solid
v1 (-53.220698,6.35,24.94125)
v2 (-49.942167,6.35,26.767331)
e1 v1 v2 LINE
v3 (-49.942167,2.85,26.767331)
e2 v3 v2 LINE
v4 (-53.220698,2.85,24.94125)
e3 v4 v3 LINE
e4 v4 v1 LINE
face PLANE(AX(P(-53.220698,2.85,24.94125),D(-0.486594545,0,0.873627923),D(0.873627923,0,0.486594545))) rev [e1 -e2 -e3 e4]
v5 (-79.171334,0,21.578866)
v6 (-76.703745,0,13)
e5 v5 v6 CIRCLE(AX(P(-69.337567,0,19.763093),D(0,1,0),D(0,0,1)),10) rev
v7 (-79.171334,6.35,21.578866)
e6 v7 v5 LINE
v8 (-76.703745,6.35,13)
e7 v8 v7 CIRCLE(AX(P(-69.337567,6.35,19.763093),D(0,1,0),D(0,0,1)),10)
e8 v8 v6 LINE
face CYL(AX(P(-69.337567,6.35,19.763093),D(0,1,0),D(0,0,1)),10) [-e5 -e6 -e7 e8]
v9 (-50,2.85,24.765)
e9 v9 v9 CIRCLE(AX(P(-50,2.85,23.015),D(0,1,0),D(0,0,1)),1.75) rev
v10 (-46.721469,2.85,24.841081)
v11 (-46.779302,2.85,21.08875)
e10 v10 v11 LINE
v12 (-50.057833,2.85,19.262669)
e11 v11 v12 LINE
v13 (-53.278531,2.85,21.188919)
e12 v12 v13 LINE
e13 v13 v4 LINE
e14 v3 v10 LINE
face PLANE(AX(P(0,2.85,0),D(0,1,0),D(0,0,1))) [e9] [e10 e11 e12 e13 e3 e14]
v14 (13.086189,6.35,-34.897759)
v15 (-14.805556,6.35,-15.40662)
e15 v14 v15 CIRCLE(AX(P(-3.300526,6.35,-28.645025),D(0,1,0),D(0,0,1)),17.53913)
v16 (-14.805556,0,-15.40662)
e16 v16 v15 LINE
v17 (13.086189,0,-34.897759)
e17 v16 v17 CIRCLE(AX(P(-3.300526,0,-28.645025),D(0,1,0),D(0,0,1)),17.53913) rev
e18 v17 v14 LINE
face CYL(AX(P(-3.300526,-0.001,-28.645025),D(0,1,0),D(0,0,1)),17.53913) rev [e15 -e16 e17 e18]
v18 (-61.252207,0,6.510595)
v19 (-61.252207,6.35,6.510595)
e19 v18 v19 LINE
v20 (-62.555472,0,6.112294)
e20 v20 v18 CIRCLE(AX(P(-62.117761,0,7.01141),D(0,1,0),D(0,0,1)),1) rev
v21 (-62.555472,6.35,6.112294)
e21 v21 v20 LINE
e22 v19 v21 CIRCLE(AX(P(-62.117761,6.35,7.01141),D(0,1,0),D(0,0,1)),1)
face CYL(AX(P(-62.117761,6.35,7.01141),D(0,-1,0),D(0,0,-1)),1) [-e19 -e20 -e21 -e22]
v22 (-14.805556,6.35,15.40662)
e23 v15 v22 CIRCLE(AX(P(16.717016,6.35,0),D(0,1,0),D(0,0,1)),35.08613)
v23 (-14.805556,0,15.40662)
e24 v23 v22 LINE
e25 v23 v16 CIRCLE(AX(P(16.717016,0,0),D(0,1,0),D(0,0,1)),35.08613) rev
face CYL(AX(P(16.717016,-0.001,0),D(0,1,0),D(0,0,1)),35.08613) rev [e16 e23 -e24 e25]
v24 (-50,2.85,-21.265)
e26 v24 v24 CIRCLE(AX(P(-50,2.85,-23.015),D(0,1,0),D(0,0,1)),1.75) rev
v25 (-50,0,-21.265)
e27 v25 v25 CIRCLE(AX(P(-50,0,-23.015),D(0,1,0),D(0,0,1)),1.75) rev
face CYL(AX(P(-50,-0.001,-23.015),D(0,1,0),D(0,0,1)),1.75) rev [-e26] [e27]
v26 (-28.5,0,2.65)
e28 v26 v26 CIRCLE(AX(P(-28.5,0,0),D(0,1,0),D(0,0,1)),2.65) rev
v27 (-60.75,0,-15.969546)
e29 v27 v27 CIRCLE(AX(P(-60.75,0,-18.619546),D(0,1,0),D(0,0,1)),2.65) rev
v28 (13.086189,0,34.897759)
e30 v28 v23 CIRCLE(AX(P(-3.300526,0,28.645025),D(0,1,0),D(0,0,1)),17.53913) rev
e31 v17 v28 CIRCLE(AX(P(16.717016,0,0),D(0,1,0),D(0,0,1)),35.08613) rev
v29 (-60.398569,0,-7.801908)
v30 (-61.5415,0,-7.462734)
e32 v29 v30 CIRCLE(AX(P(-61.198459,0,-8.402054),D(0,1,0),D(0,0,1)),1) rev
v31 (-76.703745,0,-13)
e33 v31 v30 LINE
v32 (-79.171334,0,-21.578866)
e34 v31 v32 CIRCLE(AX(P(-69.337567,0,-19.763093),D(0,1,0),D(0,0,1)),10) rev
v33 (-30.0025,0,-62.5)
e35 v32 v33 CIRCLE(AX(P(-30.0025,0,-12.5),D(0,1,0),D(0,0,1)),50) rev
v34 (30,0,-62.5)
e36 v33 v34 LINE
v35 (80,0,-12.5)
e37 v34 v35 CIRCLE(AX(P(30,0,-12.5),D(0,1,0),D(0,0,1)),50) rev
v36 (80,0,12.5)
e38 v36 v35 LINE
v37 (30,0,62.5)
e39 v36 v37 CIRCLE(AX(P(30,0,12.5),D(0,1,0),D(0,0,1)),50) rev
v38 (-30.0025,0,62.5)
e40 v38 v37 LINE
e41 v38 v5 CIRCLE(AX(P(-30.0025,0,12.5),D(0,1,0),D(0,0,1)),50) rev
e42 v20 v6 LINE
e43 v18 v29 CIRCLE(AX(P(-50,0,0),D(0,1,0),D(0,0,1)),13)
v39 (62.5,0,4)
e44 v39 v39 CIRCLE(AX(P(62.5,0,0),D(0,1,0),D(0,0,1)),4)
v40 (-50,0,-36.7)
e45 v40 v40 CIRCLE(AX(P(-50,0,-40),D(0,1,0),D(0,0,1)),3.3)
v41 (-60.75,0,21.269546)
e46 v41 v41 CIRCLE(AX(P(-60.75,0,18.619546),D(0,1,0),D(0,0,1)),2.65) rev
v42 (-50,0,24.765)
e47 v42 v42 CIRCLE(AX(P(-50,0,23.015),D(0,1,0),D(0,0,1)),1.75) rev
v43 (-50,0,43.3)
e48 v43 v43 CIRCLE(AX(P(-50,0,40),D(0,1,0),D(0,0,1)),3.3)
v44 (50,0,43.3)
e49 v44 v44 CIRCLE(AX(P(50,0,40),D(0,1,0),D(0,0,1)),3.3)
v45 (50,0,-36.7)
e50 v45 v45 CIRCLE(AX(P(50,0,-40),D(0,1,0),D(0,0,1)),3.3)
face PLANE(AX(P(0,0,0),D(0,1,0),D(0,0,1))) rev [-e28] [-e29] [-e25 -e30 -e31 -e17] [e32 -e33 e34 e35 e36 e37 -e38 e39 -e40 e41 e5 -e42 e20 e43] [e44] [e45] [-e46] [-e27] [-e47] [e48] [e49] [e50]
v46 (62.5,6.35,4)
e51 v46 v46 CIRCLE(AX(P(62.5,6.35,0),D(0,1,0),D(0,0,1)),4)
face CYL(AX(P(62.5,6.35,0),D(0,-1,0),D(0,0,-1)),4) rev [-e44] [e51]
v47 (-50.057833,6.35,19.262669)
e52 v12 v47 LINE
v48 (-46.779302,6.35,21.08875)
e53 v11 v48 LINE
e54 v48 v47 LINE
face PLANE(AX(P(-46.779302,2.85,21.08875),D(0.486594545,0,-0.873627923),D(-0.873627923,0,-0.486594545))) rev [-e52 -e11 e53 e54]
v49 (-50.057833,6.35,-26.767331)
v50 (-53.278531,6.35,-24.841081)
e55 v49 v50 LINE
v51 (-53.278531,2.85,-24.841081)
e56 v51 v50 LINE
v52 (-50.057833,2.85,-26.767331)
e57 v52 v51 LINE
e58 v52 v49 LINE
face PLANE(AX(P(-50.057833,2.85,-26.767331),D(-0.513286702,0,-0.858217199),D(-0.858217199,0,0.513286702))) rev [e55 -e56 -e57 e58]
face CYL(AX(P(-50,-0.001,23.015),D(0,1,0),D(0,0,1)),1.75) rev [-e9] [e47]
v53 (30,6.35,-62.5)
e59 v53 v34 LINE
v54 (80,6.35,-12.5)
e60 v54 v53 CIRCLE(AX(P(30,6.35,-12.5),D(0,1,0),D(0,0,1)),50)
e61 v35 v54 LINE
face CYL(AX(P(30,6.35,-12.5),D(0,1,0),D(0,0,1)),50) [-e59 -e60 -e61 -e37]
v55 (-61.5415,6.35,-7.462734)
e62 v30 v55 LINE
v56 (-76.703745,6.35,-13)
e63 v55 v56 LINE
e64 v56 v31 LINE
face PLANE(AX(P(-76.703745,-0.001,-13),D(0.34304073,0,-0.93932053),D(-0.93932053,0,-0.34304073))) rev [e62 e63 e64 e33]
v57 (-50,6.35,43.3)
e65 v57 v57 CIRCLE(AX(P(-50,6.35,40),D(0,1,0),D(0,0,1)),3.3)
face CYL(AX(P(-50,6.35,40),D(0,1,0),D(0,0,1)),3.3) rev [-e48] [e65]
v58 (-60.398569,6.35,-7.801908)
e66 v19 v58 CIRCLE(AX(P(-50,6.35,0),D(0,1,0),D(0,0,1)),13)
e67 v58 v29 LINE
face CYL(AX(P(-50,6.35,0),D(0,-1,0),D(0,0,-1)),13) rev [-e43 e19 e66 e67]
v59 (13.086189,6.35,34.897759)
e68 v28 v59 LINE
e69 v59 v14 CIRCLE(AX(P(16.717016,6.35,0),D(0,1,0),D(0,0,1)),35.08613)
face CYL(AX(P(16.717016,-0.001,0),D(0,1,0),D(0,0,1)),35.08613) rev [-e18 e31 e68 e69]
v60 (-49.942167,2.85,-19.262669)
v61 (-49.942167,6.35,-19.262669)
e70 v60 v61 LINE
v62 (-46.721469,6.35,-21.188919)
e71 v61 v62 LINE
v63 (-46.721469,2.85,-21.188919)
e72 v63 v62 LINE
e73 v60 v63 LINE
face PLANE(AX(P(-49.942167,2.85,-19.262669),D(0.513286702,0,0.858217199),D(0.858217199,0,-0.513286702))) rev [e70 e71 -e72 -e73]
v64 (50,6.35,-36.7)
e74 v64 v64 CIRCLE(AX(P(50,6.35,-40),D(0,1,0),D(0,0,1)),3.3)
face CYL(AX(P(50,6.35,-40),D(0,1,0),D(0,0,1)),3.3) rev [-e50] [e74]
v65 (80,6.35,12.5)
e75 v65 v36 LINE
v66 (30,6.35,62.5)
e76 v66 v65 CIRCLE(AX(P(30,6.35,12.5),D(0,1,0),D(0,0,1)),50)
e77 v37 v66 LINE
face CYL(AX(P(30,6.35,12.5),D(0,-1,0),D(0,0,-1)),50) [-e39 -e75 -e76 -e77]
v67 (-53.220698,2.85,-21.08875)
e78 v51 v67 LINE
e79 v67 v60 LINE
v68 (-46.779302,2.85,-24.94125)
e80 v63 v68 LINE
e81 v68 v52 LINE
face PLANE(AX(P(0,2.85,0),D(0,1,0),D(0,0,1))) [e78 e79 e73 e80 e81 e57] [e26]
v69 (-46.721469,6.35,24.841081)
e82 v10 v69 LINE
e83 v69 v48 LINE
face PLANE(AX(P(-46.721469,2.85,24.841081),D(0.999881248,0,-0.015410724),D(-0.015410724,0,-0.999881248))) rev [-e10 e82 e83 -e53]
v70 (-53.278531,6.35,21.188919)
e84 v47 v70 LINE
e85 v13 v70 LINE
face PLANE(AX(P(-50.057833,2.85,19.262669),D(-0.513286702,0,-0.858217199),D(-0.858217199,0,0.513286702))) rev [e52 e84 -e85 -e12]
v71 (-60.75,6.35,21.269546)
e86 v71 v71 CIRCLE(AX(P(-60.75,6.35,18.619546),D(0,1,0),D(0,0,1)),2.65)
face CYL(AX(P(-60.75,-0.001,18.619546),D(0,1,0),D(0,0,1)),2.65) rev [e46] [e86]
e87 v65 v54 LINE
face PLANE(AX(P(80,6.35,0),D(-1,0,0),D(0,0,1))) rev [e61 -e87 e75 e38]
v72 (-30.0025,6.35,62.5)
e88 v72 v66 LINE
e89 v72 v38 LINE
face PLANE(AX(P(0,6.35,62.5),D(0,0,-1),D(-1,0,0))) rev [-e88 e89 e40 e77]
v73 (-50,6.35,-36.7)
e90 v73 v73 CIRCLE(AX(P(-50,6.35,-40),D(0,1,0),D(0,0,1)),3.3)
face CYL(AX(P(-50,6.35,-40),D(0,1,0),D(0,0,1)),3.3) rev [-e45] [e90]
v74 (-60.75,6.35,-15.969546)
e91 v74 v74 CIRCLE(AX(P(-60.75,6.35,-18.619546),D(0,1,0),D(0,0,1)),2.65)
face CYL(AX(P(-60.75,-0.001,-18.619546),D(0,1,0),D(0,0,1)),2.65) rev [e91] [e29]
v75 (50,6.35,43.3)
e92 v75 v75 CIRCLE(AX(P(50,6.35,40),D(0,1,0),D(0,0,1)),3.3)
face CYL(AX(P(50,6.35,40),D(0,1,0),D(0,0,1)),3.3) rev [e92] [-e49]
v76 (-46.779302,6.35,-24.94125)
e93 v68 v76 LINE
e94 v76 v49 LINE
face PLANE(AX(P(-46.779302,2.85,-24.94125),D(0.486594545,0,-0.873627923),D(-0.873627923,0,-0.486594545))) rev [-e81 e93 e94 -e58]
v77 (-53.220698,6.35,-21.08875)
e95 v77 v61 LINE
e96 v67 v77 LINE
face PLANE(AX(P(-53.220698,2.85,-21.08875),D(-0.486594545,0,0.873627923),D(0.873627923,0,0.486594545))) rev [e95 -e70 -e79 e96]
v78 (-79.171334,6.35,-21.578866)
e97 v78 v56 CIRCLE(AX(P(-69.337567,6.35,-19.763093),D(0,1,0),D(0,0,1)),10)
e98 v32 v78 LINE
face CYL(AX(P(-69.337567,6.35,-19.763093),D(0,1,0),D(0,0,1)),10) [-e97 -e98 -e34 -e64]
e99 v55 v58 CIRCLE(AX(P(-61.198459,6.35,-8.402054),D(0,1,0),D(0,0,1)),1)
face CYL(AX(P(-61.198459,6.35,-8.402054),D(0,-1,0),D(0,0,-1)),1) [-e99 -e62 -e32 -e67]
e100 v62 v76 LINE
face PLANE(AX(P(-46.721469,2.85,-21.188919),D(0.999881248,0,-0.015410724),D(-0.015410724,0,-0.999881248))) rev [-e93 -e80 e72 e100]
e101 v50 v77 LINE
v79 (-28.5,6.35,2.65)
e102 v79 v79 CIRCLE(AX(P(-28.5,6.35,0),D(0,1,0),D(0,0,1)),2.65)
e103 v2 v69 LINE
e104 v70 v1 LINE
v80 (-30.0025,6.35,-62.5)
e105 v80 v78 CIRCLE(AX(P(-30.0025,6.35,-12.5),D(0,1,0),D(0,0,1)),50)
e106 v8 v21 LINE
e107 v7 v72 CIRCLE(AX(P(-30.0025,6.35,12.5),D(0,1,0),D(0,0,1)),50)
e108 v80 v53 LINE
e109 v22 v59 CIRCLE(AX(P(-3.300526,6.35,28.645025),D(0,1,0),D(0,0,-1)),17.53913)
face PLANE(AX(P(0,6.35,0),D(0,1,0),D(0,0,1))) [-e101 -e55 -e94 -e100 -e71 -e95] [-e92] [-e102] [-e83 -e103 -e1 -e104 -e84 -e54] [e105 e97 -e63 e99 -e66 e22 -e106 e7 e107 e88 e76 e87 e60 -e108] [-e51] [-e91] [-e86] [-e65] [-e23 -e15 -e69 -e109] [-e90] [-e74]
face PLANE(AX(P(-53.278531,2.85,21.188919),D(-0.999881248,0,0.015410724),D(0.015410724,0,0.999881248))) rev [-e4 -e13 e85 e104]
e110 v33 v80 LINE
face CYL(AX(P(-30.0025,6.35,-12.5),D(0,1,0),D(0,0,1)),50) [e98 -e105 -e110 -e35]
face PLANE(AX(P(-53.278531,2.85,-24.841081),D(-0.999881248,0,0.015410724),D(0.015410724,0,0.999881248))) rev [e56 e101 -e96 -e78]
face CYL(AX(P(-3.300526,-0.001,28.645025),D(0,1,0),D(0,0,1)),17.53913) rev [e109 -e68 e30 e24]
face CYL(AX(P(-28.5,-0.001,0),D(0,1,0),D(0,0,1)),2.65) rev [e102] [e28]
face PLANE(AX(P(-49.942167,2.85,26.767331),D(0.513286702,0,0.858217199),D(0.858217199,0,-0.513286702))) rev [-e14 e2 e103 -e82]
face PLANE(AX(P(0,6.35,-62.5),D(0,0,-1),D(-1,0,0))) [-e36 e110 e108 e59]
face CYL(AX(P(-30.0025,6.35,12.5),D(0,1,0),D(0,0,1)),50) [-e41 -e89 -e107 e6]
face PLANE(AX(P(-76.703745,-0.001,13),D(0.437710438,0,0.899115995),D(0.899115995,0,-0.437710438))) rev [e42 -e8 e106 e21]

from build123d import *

# Parameters (mm, degrees)
SKETCH2_R                = 13
SKETCH2_R_2              = 4
BOSS_EXTRUDE1_DEPTH      = 6.35
FILLET1_R                = 50
M6_CLEARANCE_HOLE1_D     = 6.6
M6_CLEARANCE_HOLE1_DEPTH = 15
M6_CLEARANCE_HOLE1_TIP   = 1.982840043
FILLET2_R                = 10
CUT_EXTRUDE1_REACH       = 103.718
SKETCH5_R                = 2.65
SKETCH5_R_2              = 1.75
CUT_EXTRUDE2_DEPTH       = 3.5
CUT_EXTRUDE3_REACH       = 103.718
FILLET3_R                = 1
CUT_EXTRUDE4_REACH       = 103.718


with BuildPart() as part:
    # Sketch2 → Boss-Extrude1 (new body)
    with BuildSketch(Plane(origin=(0, 0, 0), x_dir=(1, 0, 0), z_dir=(0, 1, 0))):
        with BuildLine():
            ThreePointArc((-76.703745056, 13), (-79.7, 0), (-76.703745056, -13))
            Line((-76.703745056, -13), (-80, -13))
            Line((-80, -13), (-80, -62.5))
            Line((-80, -62.5), (80, -62.5))
            Line((80, -62.5), (80, 62.5))
            Line((80, 62.5), (-80, 62.5))
            Line((-80, 62.5), (-80, 13))
            Line((-80, 13), (-76.703745056, 13))
        make_face()
        with Locations(Location((-50, 0, 0), (0, 0, 270))):
            Circle(SKETCH2_R, mode=Mode.SUBTRACT)
        with Locations(Location((62.5, 0, 0), (0, 0, 270))):
            Circle(SKETCH2_R_2, mode=Mode.SUBTRACT)
    extrude(amount=BOSS_EXTRUDE1_DEPTH)

    # Fillet1
    # the kernel refuses this fillet: 50 mm, written as the material it takes off along each edge
    with BuildSketch(Plane(origin=(80, -125, 62.5), x_dir=(-1, 0, 0), z_dir=(0, 1, 0)), Plane(origin=(80, -125, -62.5), x_dir=(0, 0, 1), z_dir=(0, 1, 0))) as fillet1_piece_1:
        with BuildLine():
            CenterArc((FILLET1_R, -FILLET1_R), FILLET1_R, 90, 90)
            Line((0, -FILLET1_R), (-FILLET1_R * 0.02, -FILLET1_R))
            Line((-FILLET1_R * 0.02, -FILLET1_R), (-FILLET1_R * 0.02, FILLET1_R * 0.02))
            Line((-FILLET1_R * 0.02, FILLET1_R * 0.02), (FILLET1_R, FILLET1_R * 0.02))
            Line((FILLET1_R, FILLET1_R * 0.02), (FILLET1_R, 0))
        make_face()
    extrude(amount=256.35, mode=Mode.SUBTRACT)
    with BuildSketch(Plane(origin=(-80, -124.993749844, -62.5), x_dir=(1, 0, 0), z_dir=(0, 1, 0))) as fillet1_piece_2:
        with BuildLine():
            CenterArc((49.997499938, -50), FILLET1_R, 90, 89.427032655)
            Line((0, -49.5), (-0.999949999, -49.49))
            ThreePointArc((-0.999949999, -49.49), (-1, -24.75), (-1, 0))
            Line((-1, 0), (0, 1))
            Line((0, 1), (49.997499938, 1))
            Line((49.997499938, 1), (49.997499938, 0))
        make_face()
    extrude(amount=256.337499688, mode=Mode.SUBTRACT)
    with BuildSketch(Plane(origin=(-80, -124.993749844, 62.5), x_dir=(0, 0, -1), z_dir=(0, 1, 0))) as fillet1_piece_3:
        with BuildLine():
            CenterArc((50, -49.997499937), FILLET1_R, 90.572967345, 89.427032655)
            Line((0, -49.997499938), (-1, -49.997499938))
            Line((-1, -49.997499938), (-1, 0))
            Line((-1, 0), (0, 1))
            ThreePointArc((0, 1), (24.75, 1), (49.49, 0.999949999))
            Line((49.49, 0.999949999), (49.5, 0))
        make_face()
    extrude(amount=256.337499688, mode=Mode.SUBTRACT)

    # M6 Clearance Hole1
    with Locations(Plane(origin=(0, 6.35, 0), x_dir=(1, 0, 0), z_dir=(0, 1, 0))):
        with Locations((50, 40), (-50, -40), (-50, 40), (50, -40)):
            Hole(M6_CLEARANCE_HOLE1_D / 2, depth=M6_CLEARANCE_HOLE1_DEPTH)
            with Locations((0, 0, -(M6_CLEARANCE_HOLE1_DEPTH + M6_CLEARANCE_HOLE1_TIP / 2))):  # 118° drill point
                Cone(0, M6_CLEARANCE_HOLE1_D / 2, M6_CLEARANCE_HOLE1_TIP, mode=Mode.SUBTRACT)

    # Fillet2
    # the kernel refuses this fillet: 10 mm, written as the material it takes off along each edge
    with BuildSketch(Plane(origin=(-80, -21.546986926, 13), x_dir=(1, 0, 0), z_dir=(0, 1, 0))) as fillet2_piece_1:
        with BuildLine():
            CenterArc((10.662433046, -6.7630925), FILLET2_R, 137.444096304, 53.017550986)
            Line((0.828666324, -8.578865625), (0.631990989, -8.615181088))
            ThreePointArc((0.631990989, -8.615181088), (0.030066454, -4.326550643), (-0.19999, -0.002))
            Line((-0.19999, -0.002), (0, 0.2))
            ThreePointArc((0, 0.2), (1.648127472, 0.2), (3.148931382, 0.13526185))
            Line((3.148931382, 0.13526185), (3.296254944, 0))
        make_face()
    extrude(amount=49.443973852, mode=Mode.SUBTRACT)
    with BuildSketch(Plane(origin=(-80, -21.546986926, -13), x_dir=(1, 0, 0), z_dir=(0, 1, 0))) as fillet2_piece_2:
        with BuildLine():
            CenterArc((10.662433046, 6.7630925), FILLET2_R, 169.538352709, 53.017550986)
            Line((0.828666324, 8.578865625), (0.631990989, 8.615181088))
            ThreePointArc((0.631990989, 8.615181088), (0.030066454, 4.326550643), (-0.19999, 0.002))
            Line((-0.19999, 0.002), (0, -0.2))
            ThreePointArc((0, -0.2), (1.648127472, -0.2), (3.148931382, -0.13526185))
            Line((3.148931382, -0.13526185), (3.296254944, 0))
        make_face()
    extrude(amount=49.443973852, mode=Mode.SUBTRACT)

    # Sketch5 → Cut-Extrude1 (cut, up to next)
    with BuildSketch(Plane(origin=(0, 6.35, 0), x_dir=(1, 0, 0), z_dir=(0, 1, 0)), mode=Mode.PRIVATE) as cut_extrude1_sk1:
        with Locations(Location((-28.5, 0, 0), (0, 0, 270))):
            Circle(SKETCH5_R)
    cut_extrude1_tool1 = extrude(cut_extrude1_sk1.sketch, amount=-CUT_EXTRUDE1_REACH, mode=Mode.PRIVATE) & part.part
    # Sketch5 → Cut-Extrude1 (cut, up to next)
    with BuildSketch(Plane(origin=(0, 6.35, 0), x_dir=(1, 0, 0), z_dir=(0, 1, 0)), mode=Mode.PRIVATE) as cut_extrude1_sk2:
        with Locations(Location((-60.75, -18.619546181, 0), (0, 0, 270))):
            Circle(SKETCH5_R)
    cut_extrude1_tool2 = extrude(cut_extrude1_sk2.sketch, amount=-CUT_EXTRUDE1_REACH, mode=Mode.PRIVATE) & part.part
    # Sketch5 → Cut-Extrude1 (cut, up to next)
    with BuildSketch(Plane(origin=(0, 6.35, 0), x_dir=(1, 0, 0), z_dir=(0, 1, 0)), mode=Mode.PRIVATE) as cut_extrude1_sk3:
        with Locations(Location((-60.75, 18.619546181, 0), (0, 0, 270))):
            Circle(SKETCH5_R)
    cut_extrude1_tool3 = extrude(cut_extrude1_sk3.sketch, amount=-CUT_EXTRUDE1_REACH, mode=Mode.PRIVATE) & part.part
    # Sketch5 → Cut-Extrude1 (cut, up to next)
    with BuildSketch(Plane(origin=(0, 6.35, 0), x_dir=(1, 0, 0), z_dir=(0, 1, 0)), mode=Mode.PRIVATE) as cut_extrude1_sk4:
        with Locations(Location((-50, 23.015, 0), (0, 0, 270))):
            Circle(SKETCH5_R_2)
    cut_extrude1_tool4 = extrude(cut_extrude1_sk4.sketch, amount=-CUT_EXTRUDE1_REACH, mode=Mode.PRIVATE) & part.part
    # Sketch5 → Cut-Extrude1 (cut, up to next)
    with BuildSketch(Plane(origin=(0, 6.35, 0), x_dir=(1, 0, 0), z_dir=(0, 1, 0)), mode=Mode.PRIVATE) as cut_extrude1_sk5:
        with Locations(Location((-50, -23.015, 0), (0, 0, 270))):
            Circle(SKETCH5_R_2)
    cut_extrude1_tool5 = extrude(cut_extrude1_sk5.sketch, amount=-CUT_EXTRUDE1_REACH, mode=Mode.PRIVATE) & part.part
    add(cut_extrude1_tool1.solids().sort_by_distance((-28.5, 6.35, 0))[0], mode=Mode.SUBTRACT)
    add(cut_extrude1_tool2.solids().sort_by_distance((-60.75, 6.35, 18.619546))[0], mode=Mode.SUBTRACT)
    add(cut_extrude1_tool3.solids().sort_by_distance((-60.75, 6.35, -18.619546))[0], mode=Mode.SUBTRACT)
    add(cut_extrude1_tool4.solids().sort_by_distance((-50, 6.35, -23.015))[0], mode=Mode.SUBTRACT)
    add(cut_extrude1_tool5.solids().sort_by_distance((-50, 6.35, 23.015))[0], mode=Mode.SUBTRACT)

    # Sketch6 → Cut-Extrude2 (cut)
    with BuildSketch(Plane(origin=(0, 6.35, 0), x_dir=(1, 0, 0), z_dir=(0, 1, 0))):
        Polygon((-53.220697552, -24.941250403), (-49.942166993, -26.767331099), (-46.721469441, -24.841080696), (-46.779302448, -21.088749597), (-50.057833007, -19.262668901), (-53.278530559, -21.188919304), align=None)
        Polygon((-46.779302448, 24.941250403), (-50.057833007, 26.767331099), (-53.278530559, 24.841080696), (-53.220697552, 21.088749597), (-49.942166993, 19.262668901), (-46.721469441, 21.188919304), align=None)
    extrude(amount=-CUT_EXTRUDE2_DEPTH, mode=Mode.SUBTRACT)

    # Sketch7 → Cut-Extrude3 (cut, up to next)
    with BuildSketch(Plane(origin=(0, 6.35, 0), x_dir=(1, 0, 0), z_dir=(0, 1, 0)), mode=Mode.PRIVATE) as cut_extrude3_sk1:
        with BuildLine():
            Line((-76.703745056, 13), (-60.823662152, 7.200578978))
            ThreePointArc((-60.823662152, 7.200578978), (-62.970841385, 0.870214783), (-61.688507937, -5.69023569))
            Line((-61.688507937, -5.69023569), (-76.703745056, -13))
            ThreePointArc((-76.703745056, -13), (-79.7, 0), (-76.703745056, 13))
        make_face()
    cut_extrude3_tool1 = extrude(cut_extrude3_sk1.sketch, amount=-CUT_EXTRUDE3_REACH, mode=Mode.PRIVATE) & part.part
    add(cut_extrude3_tool1.solids().sort_by_distance((-71.4533, 6.35, -0.3701))[0], mode=Mode.SUBTRACT)

    # Fillet3
    fillet3_edges = [part.edges().sort_by_distance(p)[0] for p in [
        (-60.823662152, 3.175, -7.200578978),
        (-61.688507937, 3.175, 5.69023569),
    ]]
    fillet(fillet3_edges, radius=FILLET3_R)

    # Sketch8 → Cut-Extrude4 (cut, up to next)
    with BuildSketch(Plane(origin=(0, 6.35, 0), x_dir=(1, 0, 0), z_dir=(0, 1, 0)), mode=Mode.PRIVATE) as cut_extrude4_sk1:
        with BuildLine():
            ThreePointArc((13.086188506, -34.897759169), (51.803145873, 0), (13.086188506, 34.897759169))
            ThreePointArc((13.086188506, 34.897759169), (-13.347108623, 43.021646829), (-14.805555972, 15.406620499))
            ThreePointArc((-14.805555972, 15.406620499), (-18.369113715, 0), (-14.805555972, -15.406620499))
            ThreePointArc((-14.805555972, -15.406620499), (-13.347108623, -43.021646829), (13.086188506, -34.897759169))
        make_face()
    cut_extrude4_tool1 = extrude(cut_extrude4_sk1.sketch, amount=-CUT_EXTRUDE4_REACH, mode=Mode.PRIVATE) & part.part
    add(cut_extrude4_tool1.solids().sort_by_distance((11.588613, 6.35, 0))[0], mode=Mode.SUBTRACT)


solid = part.part
